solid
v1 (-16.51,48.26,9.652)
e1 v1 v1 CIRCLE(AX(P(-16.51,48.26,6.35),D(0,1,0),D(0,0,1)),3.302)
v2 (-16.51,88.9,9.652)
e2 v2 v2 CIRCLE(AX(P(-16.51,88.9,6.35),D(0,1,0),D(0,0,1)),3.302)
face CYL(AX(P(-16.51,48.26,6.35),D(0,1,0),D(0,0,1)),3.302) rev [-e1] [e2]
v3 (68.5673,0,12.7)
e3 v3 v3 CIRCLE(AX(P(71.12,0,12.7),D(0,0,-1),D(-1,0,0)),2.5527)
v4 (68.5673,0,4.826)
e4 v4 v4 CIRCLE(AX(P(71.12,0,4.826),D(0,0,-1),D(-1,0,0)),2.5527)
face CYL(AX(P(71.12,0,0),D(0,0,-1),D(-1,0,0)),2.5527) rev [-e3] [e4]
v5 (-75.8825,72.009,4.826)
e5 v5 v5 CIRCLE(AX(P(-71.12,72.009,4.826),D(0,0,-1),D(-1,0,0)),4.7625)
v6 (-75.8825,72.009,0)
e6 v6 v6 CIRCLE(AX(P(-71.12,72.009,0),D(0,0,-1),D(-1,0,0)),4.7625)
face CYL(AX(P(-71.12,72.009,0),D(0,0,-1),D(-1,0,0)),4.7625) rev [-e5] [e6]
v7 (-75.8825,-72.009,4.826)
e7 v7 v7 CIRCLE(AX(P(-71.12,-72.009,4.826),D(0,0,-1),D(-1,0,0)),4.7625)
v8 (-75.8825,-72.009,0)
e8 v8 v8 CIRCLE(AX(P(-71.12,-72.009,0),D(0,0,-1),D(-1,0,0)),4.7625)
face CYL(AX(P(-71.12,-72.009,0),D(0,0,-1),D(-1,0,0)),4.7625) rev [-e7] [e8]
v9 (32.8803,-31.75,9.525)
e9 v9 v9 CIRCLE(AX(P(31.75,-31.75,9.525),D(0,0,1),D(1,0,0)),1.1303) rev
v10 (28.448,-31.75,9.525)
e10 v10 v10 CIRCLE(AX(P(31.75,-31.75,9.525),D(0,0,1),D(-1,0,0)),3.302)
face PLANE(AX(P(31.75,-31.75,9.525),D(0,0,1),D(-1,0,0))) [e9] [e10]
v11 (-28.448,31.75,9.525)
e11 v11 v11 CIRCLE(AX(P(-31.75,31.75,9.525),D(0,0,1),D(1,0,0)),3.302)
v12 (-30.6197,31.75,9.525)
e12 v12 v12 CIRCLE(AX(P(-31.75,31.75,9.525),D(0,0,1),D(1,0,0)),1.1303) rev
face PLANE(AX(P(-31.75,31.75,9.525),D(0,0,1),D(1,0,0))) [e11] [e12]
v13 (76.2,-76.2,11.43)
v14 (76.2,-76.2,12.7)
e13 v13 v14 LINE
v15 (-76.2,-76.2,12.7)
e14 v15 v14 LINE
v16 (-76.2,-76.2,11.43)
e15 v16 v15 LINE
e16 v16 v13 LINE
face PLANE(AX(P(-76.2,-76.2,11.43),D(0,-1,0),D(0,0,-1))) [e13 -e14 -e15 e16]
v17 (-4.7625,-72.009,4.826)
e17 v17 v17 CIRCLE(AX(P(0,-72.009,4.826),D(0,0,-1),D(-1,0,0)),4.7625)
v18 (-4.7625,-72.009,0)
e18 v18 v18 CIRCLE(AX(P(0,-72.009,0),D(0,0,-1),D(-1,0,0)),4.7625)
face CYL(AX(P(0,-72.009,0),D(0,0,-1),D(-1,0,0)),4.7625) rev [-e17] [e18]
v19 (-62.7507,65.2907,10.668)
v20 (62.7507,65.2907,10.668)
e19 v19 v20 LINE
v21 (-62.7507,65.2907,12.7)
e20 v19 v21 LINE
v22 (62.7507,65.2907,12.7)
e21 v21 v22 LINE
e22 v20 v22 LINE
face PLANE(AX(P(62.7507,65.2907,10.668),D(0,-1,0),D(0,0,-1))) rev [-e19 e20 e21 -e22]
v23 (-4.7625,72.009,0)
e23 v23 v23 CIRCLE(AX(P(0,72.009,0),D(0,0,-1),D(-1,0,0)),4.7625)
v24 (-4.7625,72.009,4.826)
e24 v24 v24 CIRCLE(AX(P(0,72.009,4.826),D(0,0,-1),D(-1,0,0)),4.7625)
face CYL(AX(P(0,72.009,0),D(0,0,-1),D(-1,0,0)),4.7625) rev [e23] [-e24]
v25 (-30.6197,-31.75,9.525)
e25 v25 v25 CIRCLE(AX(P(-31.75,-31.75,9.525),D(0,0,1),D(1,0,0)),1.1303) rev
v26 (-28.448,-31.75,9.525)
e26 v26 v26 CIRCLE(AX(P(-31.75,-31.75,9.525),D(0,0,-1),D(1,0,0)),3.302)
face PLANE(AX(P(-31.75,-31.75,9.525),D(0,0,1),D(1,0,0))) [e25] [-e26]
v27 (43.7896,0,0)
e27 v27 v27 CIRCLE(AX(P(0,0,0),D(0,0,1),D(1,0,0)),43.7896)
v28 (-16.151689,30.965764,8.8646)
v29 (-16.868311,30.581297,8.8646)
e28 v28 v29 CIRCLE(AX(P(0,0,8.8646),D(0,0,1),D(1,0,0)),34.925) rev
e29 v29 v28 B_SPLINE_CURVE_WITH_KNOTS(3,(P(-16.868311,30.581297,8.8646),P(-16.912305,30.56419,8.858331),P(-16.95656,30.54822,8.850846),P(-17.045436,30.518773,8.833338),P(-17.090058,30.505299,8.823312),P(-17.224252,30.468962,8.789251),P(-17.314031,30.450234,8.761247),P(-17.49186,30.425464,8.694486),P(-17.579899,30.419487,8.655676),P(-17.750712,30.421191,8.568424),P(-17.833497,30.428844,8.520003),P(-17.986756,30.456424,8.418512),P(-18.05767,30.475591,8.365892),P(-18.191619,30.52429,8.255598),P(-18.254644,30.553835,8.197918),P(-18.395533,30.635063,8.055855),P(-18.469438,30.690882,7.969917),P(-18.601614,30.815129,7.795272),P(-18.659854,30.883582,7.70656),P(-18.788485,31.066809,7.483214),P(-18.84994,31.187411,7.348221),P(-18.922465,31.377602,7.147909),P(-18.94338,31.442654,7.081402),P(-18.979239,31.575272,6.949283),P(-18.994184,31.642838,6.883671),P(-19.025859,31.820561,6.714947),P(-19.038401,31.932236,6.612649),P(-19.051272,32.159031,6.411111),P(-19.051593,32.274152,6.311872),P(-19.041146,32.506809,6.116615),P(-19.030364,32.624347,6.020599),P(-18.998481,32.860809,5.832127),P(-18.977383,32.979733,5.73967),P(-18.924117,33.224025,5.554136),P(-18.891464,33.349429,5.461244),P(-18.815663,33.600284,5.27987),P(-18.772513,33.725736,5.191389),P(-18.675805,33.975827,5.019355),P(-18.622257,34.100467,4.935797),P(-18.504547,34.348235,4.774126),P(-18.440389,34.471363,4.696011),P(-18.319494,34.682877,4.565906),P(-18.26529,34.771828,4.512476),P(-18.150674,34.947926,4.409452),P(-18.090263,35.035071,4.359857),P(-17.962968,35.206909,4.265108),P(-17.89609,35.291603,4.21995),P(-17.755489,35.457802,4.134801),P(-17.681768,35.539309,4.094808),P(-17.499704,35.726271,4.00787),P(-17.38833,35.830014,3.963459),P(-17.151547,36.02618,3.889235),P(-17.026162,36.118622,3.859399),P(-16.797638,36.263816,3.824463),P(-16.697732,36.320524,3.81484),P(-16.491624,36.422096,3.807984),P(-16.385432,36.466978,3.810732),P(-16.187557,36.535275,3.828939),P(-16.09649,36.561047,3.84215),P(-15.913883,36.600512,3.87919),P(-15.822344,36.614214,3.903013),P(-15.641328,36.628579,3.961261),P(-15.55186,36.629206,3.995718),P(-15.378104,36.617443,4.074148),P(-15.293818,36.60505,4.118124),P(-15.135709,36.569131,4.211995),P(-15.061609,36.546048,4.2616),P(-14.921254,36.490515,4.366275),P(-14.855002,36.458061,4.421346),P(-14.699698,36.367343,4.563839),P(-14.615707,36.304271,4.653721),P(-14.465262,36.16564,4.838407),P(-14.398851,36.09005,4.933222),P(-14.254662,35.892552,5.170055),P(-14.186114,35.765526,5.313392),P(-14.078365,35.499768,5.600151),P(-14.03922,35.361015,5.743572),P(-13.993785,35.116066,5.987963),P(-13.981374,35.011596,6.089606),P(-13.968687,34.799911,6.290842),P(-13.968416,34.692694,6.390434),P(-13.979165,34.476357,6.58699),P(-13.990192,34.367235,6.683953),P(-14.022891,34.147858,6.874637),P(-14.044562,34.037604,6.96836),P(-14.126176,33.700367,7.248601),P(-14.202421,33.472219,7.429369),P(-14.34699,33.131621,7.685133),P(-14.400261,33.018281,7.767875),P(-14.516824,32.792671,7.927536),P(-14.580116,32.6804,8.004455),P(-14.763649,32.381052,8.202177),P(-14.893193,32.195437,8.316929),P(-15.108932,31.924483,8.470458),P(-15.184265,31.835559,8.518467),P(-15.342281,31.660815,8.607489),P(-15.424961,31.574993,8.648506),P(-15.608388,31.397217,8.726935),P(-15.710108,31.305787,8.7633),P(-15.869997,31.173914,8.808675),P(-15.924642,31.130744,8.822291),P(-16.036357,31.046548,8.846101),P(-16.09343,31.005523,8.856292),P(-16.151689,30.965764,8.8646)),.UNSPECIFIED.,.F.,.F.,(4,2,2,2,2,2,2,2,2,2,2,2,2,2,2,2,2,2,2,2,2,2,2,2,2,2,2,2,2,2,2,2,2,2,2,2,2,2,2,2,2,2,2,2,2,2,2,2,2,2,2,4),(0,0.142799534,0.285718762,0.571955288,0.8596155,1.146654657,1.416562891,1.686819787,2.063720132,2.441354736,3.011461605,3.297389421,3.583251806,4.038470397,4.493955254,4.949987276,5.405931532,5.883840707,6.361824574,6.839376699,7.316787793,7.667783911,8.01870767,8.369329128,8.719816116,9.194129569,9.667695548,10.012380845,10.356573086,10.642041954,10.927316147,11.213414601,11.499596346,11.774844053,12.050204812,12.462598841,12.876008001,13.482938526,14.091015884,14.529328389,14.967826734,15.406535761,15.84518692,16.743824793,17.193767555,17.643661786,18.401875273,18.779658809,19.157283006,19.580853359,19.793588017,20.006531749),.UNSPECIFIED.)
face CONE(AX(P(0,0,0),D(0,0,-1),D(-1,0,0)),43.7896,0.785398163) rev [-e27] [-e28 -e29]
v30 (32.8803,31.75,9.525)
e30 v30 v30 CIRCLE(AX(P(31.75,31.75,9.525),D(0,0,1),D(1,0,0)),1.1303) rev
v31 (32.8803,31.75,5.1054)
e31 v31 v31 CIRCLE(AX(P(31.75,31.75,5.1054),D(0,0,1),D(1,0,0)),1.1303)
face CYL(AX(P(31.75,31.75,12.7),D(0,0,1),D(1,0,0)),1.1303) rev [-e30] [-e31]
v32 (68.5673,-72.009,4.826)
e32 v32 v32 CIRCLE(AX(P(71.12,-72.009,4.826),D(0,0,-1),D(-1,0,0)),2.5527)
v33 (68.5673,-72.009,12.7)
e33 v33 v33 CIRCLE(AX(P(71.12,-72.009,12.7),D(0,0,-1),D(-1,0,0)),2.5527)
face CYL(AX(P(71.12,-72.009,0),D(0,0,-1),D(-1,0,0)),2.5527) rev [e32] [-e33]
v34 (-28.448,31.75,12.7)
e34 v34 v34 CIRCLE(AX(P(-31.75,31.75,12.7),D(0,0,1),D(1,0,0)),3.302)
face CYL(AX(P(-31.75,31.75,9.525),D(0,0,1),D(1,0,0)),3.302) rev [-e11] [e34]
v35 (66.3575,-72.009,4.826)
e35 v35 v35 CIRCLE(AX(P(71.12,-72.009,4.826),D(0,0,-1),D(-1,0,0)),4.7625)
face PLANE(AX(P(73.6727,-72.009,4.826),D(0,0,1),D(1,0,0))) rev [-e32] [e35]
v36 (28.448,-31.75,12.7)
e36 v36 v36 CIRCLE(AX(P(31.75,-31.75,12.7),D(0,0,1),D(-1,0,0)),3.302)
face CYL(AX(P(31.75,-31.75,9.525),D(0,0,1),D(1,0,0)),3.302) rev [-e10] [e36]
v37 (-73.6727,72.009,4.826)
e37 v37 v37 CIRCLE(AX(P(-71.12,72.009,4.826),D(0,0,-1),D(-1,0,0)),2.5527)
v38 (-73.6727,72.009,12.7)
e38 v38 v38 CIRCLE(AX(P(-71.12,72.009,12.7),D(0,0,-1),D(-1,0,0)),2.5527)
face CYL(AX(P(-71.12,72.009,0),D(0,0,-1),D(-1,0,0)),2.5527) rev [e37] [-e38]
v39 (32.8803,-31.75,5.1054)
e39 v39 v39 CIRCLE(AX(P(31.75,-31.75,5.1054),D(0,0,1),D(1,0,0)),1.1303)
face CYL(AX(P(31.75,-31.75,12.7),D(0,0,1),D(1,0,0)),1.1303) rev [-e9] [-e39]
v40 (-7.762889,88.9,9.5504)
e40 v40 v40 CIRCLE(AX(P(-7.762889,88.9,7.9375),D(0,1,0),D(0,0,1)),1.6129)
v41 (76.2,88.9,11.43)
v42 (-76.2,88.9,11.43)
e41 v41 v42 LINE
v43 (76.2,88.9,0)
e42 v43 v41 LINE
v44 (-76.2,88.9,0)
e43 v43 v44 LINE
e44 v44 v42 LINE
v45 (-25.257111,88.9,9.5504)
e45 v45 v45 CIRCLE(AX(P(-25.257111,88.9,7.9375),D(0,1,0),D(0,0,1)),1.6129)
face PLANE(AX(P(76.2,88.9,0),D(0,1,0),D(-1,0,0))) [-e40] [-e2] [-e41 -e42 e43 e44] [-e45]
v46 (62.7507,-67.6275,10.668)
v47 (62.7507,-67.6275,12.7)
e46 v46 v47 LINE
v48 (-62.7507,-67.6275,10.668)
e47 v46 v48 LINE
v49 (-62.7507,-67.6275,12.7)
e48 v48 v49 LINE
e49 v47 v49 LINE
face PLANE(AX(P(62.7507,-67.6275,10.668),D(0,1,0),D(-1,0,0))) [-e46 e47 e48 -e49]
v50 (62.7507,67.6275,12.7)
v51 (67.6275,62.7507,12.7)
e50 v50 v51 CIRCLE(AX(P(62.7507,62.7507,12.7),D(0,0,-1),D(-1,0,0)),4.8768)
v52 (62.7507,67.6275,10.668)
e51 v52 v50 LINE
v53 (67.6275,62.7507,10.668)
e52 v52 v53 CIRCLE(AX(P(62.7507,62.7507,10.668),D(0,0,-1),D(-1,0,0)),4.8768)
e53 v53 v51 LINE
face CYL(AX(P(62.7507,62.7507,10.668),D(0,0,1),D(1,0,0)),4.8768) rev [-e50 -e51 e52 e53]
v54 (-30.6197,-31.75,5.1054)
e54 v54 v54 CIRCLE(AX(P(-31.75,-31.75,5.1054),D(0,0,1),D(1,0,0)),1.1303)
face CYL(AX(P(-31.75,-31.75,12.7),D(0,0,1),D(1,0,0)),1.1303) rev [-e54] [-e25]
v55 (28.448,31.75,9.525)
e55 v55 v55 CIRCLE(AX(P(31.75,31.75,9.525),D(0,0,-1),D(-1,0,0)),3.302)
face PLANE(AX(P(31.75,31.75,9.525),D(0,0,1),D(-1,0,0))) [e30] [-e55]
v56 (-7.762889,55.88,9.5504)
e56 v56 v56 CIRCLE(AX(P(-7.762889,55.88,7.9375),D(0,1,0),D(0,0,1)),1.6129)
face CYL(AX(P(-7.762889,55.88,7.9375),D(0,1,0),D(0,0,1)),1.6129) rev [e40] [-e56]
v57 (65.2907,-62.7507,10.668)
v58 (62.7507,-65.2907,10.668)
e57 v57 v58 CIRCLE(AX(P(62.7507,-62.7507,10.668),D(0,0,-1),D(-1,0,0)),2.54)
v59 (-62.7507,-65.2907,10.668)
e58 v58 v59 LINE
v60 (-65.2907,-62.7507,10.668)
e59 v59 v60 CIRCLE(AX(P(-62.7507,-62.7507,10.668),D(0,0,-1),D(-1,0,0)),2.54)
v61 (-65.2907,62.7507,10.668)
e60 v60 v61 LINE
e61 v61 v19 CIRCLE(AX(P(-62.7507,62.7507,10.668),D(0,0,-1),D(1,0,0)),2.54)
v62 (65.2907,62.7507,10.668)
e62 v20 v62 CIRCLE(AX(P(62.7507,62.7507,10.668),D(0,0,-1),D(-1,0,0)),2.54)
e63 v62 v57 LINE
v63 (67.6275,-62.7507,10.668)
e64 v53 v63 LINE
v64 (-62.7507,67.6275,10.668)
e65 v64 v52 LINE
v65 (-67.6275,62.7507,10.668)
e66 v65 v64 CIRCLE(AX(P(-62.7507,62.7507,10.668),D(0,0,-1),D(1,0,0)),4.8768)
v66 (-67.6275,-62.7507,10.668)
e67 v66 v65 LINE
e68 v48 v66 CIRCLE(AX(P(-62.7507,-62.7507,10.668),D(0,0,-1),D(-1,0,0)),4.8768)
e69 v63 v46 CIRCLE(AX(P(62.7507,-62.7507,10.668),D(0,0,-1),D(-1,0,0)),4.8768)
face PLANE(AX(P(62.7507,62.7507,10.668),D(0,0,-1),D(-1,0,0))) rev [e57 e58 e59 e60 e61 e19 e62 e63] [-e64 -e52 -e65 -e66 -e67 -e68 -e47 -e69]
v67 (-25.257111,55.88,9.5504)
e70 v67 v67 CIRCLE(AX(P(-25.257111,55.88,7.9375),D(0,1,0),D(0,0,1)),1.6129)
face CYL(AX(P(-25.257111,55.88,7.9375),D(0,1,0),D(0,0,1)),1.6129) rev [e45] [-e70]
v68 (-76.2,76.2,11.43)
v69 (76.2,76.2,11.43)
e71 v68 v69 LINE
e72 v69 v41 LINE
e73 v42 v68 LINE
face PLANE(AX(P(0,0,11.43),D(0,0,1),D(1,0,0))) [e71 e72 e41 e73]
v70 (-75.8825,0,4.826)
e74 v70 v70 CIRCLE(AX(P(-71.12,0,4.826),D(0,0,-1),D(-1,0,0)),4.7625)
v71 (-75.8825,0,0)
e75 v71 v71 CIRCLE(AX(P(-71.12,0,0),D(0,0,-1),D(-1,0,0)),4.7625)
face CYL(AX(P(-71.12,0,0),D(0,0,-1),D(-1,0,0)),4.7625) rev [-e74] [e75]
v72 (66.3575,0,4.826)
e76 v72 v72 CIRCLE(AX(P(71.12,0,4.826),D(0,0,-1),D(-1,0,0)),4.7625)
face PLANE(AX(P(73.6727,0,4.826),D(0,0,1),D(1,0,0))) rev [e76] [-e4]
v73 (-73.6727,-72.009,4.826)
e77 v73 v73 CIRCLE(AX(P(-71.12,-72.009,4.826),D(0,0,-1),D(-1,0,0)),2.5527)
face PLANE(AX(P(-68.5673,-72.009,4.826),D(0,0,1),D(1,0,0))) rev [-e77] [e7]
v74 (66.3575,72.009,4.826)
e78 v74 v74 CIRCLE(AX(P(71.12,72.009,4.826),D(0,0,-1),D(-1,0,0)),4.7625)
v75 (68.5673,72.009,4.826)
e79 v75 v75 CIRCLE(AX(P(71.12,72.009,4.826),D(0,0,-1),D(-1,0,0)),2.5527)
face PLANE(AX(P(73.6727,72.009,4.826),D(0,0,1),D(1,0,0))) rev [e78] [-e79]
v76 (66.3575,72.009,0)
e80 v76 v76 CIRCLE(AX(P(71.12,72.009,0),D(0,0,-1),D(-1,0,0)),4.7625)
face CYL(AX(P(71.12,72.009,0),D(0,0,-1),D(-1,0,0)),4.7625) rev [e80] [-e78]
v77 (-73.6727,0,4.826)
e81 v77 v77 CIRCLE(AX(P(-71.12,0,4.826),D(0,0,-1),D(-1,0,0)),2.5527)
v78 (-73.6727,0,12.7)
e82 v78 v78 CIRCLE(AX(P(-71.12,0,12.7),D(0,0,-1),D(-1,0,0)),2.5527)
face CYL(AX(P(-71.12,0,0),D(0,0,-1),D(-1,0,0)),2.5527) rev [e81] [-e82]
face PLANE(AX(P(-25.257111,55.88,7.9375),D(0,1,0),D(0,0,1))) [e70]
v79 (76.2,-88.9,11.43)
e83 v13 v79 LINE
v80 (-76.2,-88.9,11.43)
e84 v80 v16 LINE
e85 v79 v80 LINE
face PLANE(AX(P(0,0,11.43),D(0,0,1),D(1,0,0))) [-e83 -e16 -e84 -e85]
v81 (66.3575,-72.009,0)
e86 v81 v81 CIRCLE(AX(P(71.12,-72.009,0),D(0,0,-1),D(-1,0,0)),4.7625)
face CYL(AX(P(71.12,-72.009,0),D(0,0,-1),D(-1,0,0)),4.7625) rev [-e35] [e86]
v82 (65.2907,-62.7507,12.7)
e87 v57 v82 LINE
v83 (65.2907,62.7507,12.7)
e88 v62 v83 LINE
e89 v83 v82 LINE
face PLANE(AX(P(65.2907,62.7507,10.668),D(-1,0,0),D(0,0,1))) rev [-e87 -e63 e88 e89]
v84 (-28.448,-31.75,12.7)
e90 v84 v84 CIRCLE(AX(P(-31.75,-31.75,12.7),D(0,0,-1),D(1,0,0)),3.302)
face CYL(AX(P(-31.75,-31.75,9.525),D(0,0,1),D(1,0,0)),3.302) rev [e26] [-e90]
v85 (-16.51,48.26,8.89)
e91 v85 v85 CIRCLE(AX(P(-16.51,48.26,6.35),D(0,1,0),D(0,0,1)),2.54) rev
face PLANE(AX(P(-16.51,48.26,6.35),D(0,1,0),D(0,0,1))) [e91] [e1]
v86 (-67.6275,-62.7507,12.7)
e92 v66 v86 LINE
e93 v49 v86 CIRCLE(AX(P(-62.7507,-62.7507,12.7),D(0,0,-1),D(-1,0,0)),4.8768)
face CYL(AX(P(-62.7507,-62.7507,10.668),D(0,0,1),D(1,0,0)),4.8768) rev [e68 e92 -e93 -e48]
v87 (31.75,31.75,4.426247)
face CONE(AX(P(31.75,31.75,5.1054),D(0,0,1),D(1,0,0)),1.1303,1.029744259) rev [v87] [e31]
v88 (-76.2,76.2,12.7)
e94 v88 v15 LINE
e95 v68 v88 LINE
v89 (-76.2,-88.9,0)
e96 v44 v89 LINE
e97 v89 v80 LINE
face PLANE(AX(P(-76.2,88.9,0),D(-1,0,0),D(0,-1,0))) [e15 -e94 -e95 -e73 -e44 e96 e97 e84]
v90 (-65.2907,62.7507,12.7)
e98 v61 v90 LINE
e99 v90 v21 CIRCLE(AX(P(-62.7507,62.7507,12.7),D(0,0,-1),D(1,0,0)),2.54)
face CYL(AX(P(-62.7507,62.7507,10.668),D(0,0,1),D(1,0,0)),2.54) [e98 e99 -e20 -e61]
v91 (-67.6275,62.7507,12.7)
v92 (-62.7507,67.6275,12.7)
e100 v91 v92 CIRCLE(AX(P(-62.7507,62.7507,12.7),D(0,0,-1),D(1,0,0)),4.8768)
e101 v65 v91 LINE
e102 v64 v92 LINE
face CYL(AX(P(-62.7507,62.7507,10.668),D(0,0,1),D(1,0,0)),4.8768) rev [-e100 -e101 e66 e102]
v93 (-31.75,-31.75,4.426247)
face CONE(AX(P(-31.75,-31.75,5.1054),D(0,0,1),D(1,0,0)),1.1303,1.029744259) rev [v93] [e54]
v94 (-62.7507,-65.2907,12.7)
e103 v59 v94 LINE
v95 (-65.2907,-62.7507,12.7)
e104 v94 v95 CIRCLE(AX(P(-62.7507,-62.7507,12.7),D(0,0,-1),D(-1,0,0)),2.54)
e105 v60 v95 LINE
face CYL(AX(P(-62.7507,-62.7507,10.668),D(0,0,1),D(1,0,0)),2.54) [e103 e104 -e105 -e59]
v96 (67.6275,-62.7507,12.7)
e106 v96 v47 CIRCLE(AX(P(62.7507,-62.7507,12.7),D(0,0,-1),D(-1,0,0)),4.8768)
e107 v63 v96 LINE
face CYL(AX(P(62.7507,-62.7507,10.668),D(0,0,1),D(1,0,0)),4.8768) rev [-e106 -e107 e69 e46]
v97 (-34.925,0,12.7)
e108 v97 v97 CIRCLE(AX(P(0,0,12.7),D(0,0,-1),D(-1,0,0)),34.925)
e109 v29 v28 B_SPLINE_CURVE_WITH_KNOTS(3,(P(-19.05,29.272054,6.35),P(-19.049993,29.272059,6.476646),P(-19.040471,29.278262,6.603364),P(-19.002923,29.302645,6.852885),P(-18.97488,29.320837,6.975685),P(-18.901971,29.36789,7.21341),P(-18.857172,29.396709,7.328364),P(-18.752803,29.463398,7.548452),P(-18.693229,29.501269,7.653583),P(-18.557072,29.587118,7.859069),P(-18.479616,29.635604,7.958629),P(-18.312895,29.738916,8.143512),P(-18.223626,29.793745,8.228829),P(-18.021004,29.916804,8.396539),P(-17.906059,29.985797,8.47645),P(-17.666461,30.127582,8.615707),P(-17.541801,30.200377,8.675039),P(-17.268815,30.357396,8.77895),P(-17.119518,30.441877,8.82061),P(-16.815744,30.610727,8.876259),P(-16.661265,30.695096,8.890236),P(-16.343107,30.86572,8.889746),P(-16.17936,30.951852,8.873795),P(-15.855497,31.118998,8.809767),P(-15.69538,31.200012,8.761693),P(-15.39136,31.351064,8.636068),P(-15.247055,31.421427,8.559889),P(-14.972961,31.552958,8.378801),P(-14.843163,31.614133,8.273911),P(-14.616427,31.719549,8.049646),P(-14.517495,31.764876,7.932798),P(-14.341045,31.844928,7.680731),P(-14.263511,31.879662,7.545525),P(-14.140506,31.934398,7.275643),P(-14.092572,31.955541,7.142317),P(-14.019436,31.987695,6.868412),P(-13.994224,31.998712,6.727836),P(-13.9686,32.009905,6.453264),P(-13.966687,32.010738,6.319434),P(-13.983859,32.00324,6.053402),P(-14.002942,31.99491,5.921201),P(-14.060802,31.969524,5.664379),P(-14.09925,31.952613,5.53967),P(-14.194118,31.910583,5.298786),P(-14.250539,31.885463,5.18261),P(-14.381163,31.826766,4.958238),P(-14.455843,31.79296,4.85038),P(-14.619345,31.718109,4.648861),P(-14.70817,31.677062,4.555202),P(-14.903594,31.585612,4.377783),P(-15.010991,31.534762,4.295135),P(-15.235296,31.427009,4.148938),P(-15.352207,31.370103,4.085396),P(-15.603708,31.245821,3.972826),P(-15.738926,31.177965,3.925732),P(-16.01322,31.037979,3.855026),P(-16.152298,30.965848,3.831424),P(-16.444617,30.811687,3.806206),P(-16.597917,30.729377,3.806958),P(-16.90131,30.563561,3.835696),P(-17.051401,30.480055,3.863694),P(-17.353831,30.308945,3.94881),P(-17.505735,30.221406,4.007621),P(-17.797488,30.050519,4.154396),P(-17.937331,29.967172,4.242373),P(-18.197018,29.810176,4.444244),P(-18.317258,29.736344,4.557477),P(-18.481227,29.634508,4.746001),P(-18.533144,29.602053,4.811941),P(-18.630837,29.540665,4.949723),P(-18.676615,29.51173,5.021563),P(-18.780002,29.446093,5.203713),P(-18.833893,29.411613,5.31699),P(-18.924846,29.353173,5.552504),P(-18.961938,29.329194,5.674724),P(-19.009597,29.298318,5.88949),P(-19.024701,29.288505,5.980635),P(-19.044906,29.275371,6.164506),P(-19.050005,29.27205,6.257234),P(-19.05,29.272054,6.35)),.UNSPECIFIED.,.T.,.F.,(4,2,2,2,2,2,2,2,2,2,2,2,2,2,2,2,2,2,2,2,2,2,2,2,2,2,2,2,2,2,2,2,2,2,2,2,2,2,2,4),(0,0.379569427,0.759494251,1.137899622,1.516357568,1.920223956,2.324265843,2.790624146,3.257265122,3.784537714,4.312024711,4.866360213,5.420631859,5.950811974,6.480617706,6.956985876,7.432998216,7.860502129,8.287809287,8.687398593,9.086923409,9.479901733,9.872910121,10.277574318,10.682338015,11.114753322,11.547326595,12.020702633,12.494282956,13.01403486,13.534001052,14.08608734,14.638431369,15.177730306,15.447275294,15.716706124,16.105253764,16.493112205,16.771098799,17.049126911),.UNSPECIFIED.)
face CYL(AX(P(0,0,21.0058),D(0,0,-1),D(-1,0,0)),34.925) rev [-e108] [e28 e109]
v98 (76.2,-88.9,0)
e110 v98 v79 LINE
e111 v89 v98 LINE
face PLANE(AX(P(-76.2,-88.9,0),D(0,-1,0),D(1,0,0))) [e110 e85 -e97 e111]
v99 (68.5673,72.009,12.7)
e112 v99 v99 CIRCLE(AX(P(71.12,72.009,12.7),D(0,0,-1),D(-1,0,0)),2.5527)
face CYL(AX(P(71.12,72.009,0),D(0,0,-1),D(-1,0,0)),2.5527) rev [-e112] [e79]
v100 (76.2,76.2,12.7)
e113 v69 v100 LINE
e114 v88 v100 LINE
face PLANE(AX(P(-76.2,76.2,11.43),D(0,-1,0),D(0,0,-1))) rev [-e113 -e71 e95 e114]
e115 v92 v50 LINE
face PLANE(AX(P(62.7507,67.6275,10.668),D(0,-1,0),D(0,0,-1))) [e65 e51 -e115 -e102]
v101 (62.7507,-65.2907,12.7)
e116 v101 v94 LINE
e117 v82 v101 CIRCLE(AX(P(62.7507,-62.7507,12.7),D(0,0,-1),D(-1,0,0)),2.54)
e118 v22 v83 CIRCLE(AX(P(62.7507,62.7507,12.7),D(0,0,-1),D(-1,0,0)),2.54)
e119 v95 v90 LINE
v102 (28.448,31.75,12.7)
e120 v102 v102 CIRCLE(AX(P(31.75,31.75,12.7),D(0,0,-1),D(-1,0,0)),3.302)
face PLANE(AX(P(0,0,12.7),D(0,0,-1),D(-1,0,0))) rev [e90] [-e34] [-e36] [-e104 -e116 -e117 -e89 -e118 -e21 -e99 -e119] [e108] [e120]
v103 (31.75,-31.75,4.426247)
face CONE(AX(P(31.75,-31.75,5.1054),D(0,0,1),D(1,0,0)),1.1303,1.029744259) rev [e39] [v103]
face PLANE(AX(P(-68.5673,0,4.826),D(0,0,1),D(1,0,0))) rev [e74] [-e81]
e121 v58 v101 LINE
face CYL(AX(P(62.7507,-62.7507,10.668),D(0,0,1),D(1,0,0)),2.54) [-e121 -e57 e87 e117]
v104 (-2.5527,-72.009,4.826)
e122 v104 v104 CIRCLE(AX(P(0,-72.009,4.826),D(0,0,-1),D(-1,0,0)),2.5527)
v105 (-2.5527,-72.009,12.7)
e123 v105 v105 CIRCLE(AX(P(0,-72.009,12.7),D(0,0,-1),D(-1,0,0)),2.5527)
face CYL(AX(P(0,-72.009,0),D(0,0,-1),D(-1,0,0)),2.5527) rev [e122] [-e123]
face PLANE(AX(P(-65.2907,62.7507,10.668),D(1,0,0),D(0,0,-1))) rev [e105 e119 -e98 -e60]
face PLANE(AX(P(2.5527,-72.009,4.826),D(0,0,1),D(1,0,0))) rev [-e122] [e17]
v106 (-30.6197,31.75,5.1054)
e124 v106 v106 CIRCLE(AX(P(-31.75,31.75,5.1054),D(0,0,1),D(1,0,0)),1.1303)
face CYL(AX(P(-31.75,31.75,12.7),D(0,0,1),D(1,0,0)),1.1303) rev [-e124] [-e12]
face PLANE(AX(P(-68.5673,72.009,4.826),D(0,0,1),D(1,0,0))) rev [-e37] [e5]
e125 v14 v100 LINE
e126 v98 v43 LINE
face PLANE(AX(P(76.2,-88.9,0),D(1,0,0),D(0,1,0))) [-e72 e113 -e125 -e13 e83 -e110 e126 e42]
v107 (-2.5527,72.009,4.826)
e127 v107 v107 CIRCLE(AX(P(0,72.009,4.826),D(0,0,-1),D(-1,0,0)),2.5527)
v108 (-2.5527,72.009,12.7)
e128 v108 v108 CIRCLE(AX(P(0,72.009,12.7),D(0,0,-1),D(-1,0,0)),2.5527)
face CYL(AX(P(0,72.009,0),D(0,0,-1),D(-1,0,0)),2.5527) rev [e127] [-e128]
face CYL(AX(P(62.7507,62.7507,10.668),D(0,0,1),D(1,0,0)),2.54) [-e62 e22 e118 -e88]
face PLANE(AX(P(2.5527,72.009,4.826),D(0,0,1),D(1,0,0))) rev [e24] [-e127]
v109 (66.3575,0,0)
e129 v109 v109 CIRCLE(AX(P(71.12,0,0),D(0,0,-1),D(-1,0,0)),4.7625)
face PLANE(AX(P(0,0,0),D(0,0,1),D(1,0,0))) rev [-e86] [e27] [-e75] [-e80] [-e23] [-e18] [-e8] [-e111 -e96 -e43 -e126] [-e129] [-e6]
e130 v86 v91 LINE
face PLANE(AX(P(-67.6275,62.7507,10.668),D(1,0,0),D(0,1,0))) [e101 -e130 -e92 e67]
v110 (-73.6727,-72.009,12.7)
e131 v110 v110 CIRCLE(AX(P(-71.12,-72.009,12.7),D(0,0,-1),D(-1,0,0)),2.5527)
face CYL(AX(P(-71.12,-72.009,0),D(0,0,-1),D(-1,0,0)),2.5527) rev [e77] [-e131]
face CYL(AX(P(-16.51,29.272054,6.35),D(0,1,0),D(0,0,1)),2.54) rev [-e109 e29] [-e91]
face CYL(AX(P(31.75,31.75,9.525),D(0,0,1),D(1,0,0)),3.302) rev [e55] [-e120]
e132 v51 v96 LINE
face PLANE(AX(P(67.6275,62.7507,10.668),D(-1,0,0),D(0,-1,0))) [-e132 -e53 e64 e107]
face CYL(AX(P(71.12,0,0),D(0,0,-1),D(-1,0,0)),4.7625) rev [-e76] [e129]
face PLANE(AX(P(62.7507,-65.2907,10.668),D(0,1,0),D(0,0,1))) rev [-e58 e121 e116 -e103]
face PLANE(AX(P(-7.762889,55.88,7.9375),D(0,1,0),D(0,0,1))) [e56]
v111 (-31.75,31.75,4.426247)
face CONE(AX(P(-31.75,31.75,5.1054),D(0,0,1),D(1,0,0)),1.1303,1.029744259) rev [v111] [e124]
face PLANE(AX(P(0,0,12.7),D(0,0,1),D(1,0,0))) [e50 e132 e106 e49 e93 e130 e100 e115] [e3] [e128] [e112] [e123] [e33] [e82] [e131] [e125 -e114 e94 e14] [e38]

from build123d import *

# Parameters (mm, degrees)
SKETCH1_W                                       = 152.4
SKETCH1_H                                       = 177.8
BOSS_EXTRUDE1_DEPTH                             = 12.7
CUT_EXTRUDE5_START                              = -1.9304
CUT_EXTRUDE5_OUTLINE_W                          = 127
CUT_EXTRUDE5_OUTLINE_H                          = 127
CUT_EXTRUDE5_DEPTH                              = 1.9304
SKETCH7_W                                       = 102.9208
SKETCH7_H                                       = 102.9208
BOSS_EXTRUDE2_DEPTH                             = 1.9304
SKETCH9_W                                       = 34.925
SKETCH9_H                                       = 19.05
CBORE_FOR_10_SOCKET_HEAD_CAP_SCREW1_D           = 5.1054
CBORE_FOR_10_SOCKET_HEAD_CAP_SCREW1_CBORE_D     = 9.525
CBORE_FOR_10_SOCKET_HEAD_CAP_SCREW1_CBORE_DEPTH = 4.826
CBORE_FOR_10_SOCKET_HEAD_CAP_SCREW2_D           = 5.1054
CBORE_FOR_10_SOCKET_HEAD_CAP_SCREW2_CBORE_D     = 9.525
CBORE_FOR_10_SOCKET_HEAD_CAP_SCREW2_CBORE_DEPTH = 4.826
F_4_40_TAPPED_HOLE1_D                           = 2.2606
F_4_40_TAPPED_HOLE1_DEPTH                       = 7.5946
F_4_40_TAPPED_HOLE1_TIP                         = 0.679152758
SKETCH25_R                                      = 3.302
CUT_EXTRUDE7_DEPTH                              = 3.175
MIRROR2_COPY_1_SKETCH_R                         = 3.302
MIRROR2_COPY_1_DEPTH                            = 3.175
SKETCH26_W                                      = 152.4
SKETCH26_H                                      = 12.7
CUT_EXTRUDE8_DEPTH                              = 1.27
SKETCH30_R                                      = 1.6129
CUT_EXTRUDE12_DEPTH                             = 33.02
SKETCH31_R                                      = 3.302
CUT_EXTRUDE13_DEPTH                             = 40.64
CUT_EXTRUDE15_DEPTH                             = 2.032
SKETCH37_R                                      = 34.925
CUT_EXTRUDE18_DEPTH                             = 118.580133678
CHAMFER2_SIZE                                   = 8.8646
SKETCH38_W                                      = 127
SKETCH38_H                                      = 127
SKETCH38_W_2                                    = 102.9208
SKETCH38_H_2                                    = 102.9208
BOSS_EXTRUDE3_DEPTH                             = 1.9304


# Read off the part's stored shape, not the designer's step: Cut-Extrude5
with BuildPart() as part:
    # Sketch1 → Boss-Extrude1 (new body)
    with BuildSketch(Plane.XY.offset(12.7)):
        Rectangle(SKETCH1_W, SKETCH1_H)
    extrude(amount=-BOSS_EXTRUDE1_DEPTH)

    # Cut-Extrude5 outline → Cut-Extrude5 (cut)
    with BuildSketch(Plane.XY.offset(12.7).offset(CUT_EXTRUDE5_START)):
        Rectangle(CUT_EXTRUDE5_OUTLINE_W, CUT_EXTRUDE5_OUTLINE_H)
    extrude(amount=CUT_EXTRUDE5_DEPTH, mode=Mode.SUBTRACT)

    # Sketch7 → Boss-Extrude2 (add)
    with BuildSketch(Plane.XY.offset(10.7696)):
        Rectangle(SKETCH7_W, SKETCH7_H)
    extrude(amount=BOSS_EXTRUDE2_DEPTH)

    # Sketch9 → Cut-Revolve1 (revolve, cut)
    with BuildSketch(Plane.XZ, mode=Mode.PRIVATE) as cut_revolve1_sk:
        with Locations((17.4625, 11.4808)):
            Rectangle(SKETCH9_W, SKETCH9_H)
    revolve(cut_revolve1_sk.sketch.rotate(Axis((0, 0, 21.0058), (0, 0, -1)), 180), axis=Axis((0, 0, 21.0058), (0, 0, -1)), mode=Mode.SUBTRACT)

    # Sketch10 → Cut-Revolve2 (revolve, cut)
    with BuildSketch(Plane(origin=(-16.51, 0, 0), x_dir=(0, 0, -1), z_dir=(1, 0, 0))):
        Polygon((-6.35, 76.2), (-8.3165188, 76.2), (-7.718188123, 70.325851431), (-7.026590967, 70.325851431), (-7.026590967, 63.019039257), (-8.89, 62.746717258), (-8.89, 29.272053652), (-6.35, 29.272053652), align=None)
    revolve(axis=Axis((-16.51, 29.272053652, 6.35), (0, 1, 0)), mode=Mode.SUBTRACT)

    # CBORE for #10 Socket Head Cap Screw1 (through all)
    with Locations(Plane(origin=(0, 0, 0), x_dir=(-1, 0, 0), z_dir=(0, 0, -1))):
        with Locations((0, 72.009), (0, -72.009)):
            CounterBoreHole(CBORE_FOR_10_SOCKET_HEAD_CAP_SCREW1_D / 2, CBORE_FOR_10_SOCKET_HEAD_CAP_SCREW1_CBORE_D / 2, CBORE_FOR_10_SOCKET_HEAD_CAP_SCREW1_CBORE_DEPTH)

    # CBORE for #10 Socket Head Cap Screw2 (through all)
    with Locations(Plane(origin=(0, 0, 0), x_dir=(-1, 0, 0), z_dir=(0, 0, -1))):
        with Locations((71.12, 0), (71.12, -72.009), (71.12, 72.009)):
            cbore_for_10_socket_head_cap_screw2 = CounterBoreHole(CBORE_FOR_10_SOCKET_HEAD_CAP_SCREW2_D / 2, CBORE_FOR_10_SOCKET_HEAD_CAP_SCREW2_CBORE_D / 2, CBORE_FOR_10_SOCKET_HEAD_CAP_SCREW2_CBORE_DEPTH)

    # #4-40 Tapped Hole1
    with Locations(Plane.XY.offset(12.7)):
        with Locations((-31.75, 31.75), (31.75, 31.75), (31.75, -31.75), (-31.75, -31.75)):
            Hole(F_4_40_TAPPED_HOLE1_D / 2, depth=F_4_40_TAPPED_HOLE1_DEPTH)
            with Locations((0, 0, -(F_4_40_TAPPED_HOLE1_DEPTH + F_4_40_TAPPED_HOLE1_TIP / 2))):  # 118° drill point
                Cone(0, F_4_40_TAPPED_HOLE1_D / 2, F_4_40_TAPPED_HOLE1_TIP, mode=Mode.SUBTRACT)

    # Sketch25 → Cut-Extrude7 (cut)
    with BuildSketch(Plane.XY.offset(12.7)):
        with Locations((-31.75, 31.75)):
            Circle(SKETCH25_R)
    cut_extrude7 = extrude(amount=-CUT_EXTRUDE7_DEPTH, mode=Mode.SUBTRACT)

    # Mirror1: Cut-Extrude7 across plane
    add(cut_extrude7.mirror(Plane(origin=(0, 0, 0), x_dir=(0, 0, 1), z_dir=(1, 0, 0))), mode=Mode.SUBTRACT)

    # Mirror2: Cut-Extrude7 across plane
    add(cut_extrude7.mirror(Plane.ZX), mode=Mode.SUBTRACT)

    # Mirror2 copy 1 sketch → Mirror2 copy 1 (cut)
    with BuildSketch(Plane(origin=(0, 0, 12.7), x_dir=(-1, 0, 0), z_dir=(0, 0, 1))):
        with Locations((-31.75, 31.75)):
            Circle(MIRROR2_COPY_1_SKETCH_R)
    extrude(amount=-MIRROR2_COPY_1_DEPTH, mode=Mode.SUBTRACT)

    # Sketch26 → Cut-Extrude8 (cut)
    with BuildSketch(Plane.XY.offset(12.7)):
        with Locations((0, 82.55)):
            Rectangle(SKETCH26_W, SKETCH26_H)
    cut_extrude8 = extrude(amount=-CUT_EXTRUDE8_DEPTH, mode=Mode.SUBTRACT)

    # Mirror4: Cut-Extrude8 across plane
    add(cut_extrude8.mirror(Plane.ZX), mode=Mode.SUBTRACT)

    # Sketch30 → Cut-Extrude12 (cut)
    with BuildSketch(Plane(origin=(0, 88.9, 0), x_dir=(1, 0, 0), z_dir=(0, 1, 0))):
        with Locations(Location((-7.762889406, -7.9375, 0), (0, 0, 270))):
            Circle(SKETCH30_R)
        with Locations(Location((-25.257110594, -7.9375, 0), (0, 0, 270))):
            Circle(SKETCH30_R)
    extrude(amount=-CUT_EXTRUDE12_DEPTH, mode=Mode.SUBTRACT)

    # Sketch31 → Cut-Extrude13 (cut)
    with BuildSketch(Plane(origin=(0, 88.9, 0), x_dir=(1, 0, 0), z_dir=(0, 1, 0))):
        with Locations(Location((-16.51, -6.35, 0), (0, 0, 270))):
            Circle(SKETCH31_R)
    extrude(amount=-CUT_EXTRUDE13_DEPTH, mode=Mode.SUBTRACT)

    # Mirror7: CBORE for #10 Socket Head Cap Screw2 across plane
    add(cbore_for_10_socket_head_cap_screw2.mirror(Plane(origin=(0, 0, 0), x_dir=(0, 0, 1), z_dir=(1, 0, 0))), mode=Mode.SUBTRACT)

    # Sketch33 → Cut-Extrude15 (cut)
    with BuildSketch(Plane(origin=(0, 0, 12.7), x_dir=(-1, 0, 0), z_dir=(0, 0, -1))):
        with BuildLine():
            Line((-62.7507, 67.6275), (62.7507, 67.6275))
            ThreePointArc((62.7507, 67.6275), (66.19911835, 66.19911835), (67.6275, 62.7507))
            Line((67.6275, 62.7507), (67.6275, -62.7507))
            ThreePointArc((67.6275, -62.7507), (66.19911835, -66.19911835), (62.7507, -67.6275))
            Line((62.7507, -67.6275), (-62.7507, -67.6275))
            ThreePointArc((-62.7507, -67.6275), (-66.19911835, -66.19911835), (-67.6275, -62.7507))
            Line((-67.6275, -62.7507), (-67.6275, 62.7507))
            ThreePointArc((-67.6275, 62.7507), (-66.19911835, 66.19911835), (-62.7507, 67.6275))
        make_face()
        with BuildLine():
            Line((-62.7507, 65.2907), (62.7507, 65.2907))
            ThreePointArc((62.7507, 65.2907), (64.546751224, 64.546751224), (65.2907, 62.7507))
            Line((65.2907, 62.7507), (65.2907, -62.7507))
            ThreePointArc((65.2907, -62.7507), (64.546751224, -64.546751224), (62.7507, -65.2907))
            Line((62.7507, -65.2907), (-62.7507, -65.2907))
            ThreePointArc((-62.7507, -65.2907), (-64.546751224, -64.546751224), (-65.2907, -62.7507))
            Line((-65.2907, -62.7507), (-65.2907, 62.7507))
            ThreePointArc((-65.2907, 62.7507), (-64.546751224, 64.546751224), (-62.7507, 65.2907))
        make_face(mode=Mode.SUBTRACT)
    extrude(amount=CUT_EXTRUDE15_DEPTH, mode=Mode.SUBTRACT)

    # Sketch37 → Cut-Extrude18 (cut, through all)
    with BuildSketch(Plane.XY.offset(1.9558)):
        with Locations(Location((0, 0, 0), (0, 0, 180))):
            Circle(SKETCH37_R)
    extrude(amount=-CUT_EXTRUDE18_DEPTH, mode=Mode.SUBTRACT)

    # Chamfer2
    # the kernel refuses this chamfer: 8.8646 mm, written as the material it takes off along each edge
    with BuildSketch(Plane(origin=(0, 0, 0), x_dir=(-1, 0, 0), z_dir=(0, 1, 0))) as chamfer2_piece_1:
        Polygon((34.925 + CHAMFER2_SIZE, 0), (34.925, CHAMFER2_SIZE), (34.925, 0), align=None)
    revolve(axis=Axis((0, 0, 0), (0, 0, 1)), mode=Mode.SUBTRACT)

    # Sketch38 → Boss-Extrude3 (add)
    with BuildSketch(Plane.XY.offset(10.7696)):
        Rectangle(SKETCH38_W, SKETCH38_H)
        Rectangle(SKETCH38_W_2, SKETCH38_H_2, mode=Mode.SUBTRACT)
    extrude(amount=BOSS_EXTRUDE3_DEPTH)


solid = part.part
